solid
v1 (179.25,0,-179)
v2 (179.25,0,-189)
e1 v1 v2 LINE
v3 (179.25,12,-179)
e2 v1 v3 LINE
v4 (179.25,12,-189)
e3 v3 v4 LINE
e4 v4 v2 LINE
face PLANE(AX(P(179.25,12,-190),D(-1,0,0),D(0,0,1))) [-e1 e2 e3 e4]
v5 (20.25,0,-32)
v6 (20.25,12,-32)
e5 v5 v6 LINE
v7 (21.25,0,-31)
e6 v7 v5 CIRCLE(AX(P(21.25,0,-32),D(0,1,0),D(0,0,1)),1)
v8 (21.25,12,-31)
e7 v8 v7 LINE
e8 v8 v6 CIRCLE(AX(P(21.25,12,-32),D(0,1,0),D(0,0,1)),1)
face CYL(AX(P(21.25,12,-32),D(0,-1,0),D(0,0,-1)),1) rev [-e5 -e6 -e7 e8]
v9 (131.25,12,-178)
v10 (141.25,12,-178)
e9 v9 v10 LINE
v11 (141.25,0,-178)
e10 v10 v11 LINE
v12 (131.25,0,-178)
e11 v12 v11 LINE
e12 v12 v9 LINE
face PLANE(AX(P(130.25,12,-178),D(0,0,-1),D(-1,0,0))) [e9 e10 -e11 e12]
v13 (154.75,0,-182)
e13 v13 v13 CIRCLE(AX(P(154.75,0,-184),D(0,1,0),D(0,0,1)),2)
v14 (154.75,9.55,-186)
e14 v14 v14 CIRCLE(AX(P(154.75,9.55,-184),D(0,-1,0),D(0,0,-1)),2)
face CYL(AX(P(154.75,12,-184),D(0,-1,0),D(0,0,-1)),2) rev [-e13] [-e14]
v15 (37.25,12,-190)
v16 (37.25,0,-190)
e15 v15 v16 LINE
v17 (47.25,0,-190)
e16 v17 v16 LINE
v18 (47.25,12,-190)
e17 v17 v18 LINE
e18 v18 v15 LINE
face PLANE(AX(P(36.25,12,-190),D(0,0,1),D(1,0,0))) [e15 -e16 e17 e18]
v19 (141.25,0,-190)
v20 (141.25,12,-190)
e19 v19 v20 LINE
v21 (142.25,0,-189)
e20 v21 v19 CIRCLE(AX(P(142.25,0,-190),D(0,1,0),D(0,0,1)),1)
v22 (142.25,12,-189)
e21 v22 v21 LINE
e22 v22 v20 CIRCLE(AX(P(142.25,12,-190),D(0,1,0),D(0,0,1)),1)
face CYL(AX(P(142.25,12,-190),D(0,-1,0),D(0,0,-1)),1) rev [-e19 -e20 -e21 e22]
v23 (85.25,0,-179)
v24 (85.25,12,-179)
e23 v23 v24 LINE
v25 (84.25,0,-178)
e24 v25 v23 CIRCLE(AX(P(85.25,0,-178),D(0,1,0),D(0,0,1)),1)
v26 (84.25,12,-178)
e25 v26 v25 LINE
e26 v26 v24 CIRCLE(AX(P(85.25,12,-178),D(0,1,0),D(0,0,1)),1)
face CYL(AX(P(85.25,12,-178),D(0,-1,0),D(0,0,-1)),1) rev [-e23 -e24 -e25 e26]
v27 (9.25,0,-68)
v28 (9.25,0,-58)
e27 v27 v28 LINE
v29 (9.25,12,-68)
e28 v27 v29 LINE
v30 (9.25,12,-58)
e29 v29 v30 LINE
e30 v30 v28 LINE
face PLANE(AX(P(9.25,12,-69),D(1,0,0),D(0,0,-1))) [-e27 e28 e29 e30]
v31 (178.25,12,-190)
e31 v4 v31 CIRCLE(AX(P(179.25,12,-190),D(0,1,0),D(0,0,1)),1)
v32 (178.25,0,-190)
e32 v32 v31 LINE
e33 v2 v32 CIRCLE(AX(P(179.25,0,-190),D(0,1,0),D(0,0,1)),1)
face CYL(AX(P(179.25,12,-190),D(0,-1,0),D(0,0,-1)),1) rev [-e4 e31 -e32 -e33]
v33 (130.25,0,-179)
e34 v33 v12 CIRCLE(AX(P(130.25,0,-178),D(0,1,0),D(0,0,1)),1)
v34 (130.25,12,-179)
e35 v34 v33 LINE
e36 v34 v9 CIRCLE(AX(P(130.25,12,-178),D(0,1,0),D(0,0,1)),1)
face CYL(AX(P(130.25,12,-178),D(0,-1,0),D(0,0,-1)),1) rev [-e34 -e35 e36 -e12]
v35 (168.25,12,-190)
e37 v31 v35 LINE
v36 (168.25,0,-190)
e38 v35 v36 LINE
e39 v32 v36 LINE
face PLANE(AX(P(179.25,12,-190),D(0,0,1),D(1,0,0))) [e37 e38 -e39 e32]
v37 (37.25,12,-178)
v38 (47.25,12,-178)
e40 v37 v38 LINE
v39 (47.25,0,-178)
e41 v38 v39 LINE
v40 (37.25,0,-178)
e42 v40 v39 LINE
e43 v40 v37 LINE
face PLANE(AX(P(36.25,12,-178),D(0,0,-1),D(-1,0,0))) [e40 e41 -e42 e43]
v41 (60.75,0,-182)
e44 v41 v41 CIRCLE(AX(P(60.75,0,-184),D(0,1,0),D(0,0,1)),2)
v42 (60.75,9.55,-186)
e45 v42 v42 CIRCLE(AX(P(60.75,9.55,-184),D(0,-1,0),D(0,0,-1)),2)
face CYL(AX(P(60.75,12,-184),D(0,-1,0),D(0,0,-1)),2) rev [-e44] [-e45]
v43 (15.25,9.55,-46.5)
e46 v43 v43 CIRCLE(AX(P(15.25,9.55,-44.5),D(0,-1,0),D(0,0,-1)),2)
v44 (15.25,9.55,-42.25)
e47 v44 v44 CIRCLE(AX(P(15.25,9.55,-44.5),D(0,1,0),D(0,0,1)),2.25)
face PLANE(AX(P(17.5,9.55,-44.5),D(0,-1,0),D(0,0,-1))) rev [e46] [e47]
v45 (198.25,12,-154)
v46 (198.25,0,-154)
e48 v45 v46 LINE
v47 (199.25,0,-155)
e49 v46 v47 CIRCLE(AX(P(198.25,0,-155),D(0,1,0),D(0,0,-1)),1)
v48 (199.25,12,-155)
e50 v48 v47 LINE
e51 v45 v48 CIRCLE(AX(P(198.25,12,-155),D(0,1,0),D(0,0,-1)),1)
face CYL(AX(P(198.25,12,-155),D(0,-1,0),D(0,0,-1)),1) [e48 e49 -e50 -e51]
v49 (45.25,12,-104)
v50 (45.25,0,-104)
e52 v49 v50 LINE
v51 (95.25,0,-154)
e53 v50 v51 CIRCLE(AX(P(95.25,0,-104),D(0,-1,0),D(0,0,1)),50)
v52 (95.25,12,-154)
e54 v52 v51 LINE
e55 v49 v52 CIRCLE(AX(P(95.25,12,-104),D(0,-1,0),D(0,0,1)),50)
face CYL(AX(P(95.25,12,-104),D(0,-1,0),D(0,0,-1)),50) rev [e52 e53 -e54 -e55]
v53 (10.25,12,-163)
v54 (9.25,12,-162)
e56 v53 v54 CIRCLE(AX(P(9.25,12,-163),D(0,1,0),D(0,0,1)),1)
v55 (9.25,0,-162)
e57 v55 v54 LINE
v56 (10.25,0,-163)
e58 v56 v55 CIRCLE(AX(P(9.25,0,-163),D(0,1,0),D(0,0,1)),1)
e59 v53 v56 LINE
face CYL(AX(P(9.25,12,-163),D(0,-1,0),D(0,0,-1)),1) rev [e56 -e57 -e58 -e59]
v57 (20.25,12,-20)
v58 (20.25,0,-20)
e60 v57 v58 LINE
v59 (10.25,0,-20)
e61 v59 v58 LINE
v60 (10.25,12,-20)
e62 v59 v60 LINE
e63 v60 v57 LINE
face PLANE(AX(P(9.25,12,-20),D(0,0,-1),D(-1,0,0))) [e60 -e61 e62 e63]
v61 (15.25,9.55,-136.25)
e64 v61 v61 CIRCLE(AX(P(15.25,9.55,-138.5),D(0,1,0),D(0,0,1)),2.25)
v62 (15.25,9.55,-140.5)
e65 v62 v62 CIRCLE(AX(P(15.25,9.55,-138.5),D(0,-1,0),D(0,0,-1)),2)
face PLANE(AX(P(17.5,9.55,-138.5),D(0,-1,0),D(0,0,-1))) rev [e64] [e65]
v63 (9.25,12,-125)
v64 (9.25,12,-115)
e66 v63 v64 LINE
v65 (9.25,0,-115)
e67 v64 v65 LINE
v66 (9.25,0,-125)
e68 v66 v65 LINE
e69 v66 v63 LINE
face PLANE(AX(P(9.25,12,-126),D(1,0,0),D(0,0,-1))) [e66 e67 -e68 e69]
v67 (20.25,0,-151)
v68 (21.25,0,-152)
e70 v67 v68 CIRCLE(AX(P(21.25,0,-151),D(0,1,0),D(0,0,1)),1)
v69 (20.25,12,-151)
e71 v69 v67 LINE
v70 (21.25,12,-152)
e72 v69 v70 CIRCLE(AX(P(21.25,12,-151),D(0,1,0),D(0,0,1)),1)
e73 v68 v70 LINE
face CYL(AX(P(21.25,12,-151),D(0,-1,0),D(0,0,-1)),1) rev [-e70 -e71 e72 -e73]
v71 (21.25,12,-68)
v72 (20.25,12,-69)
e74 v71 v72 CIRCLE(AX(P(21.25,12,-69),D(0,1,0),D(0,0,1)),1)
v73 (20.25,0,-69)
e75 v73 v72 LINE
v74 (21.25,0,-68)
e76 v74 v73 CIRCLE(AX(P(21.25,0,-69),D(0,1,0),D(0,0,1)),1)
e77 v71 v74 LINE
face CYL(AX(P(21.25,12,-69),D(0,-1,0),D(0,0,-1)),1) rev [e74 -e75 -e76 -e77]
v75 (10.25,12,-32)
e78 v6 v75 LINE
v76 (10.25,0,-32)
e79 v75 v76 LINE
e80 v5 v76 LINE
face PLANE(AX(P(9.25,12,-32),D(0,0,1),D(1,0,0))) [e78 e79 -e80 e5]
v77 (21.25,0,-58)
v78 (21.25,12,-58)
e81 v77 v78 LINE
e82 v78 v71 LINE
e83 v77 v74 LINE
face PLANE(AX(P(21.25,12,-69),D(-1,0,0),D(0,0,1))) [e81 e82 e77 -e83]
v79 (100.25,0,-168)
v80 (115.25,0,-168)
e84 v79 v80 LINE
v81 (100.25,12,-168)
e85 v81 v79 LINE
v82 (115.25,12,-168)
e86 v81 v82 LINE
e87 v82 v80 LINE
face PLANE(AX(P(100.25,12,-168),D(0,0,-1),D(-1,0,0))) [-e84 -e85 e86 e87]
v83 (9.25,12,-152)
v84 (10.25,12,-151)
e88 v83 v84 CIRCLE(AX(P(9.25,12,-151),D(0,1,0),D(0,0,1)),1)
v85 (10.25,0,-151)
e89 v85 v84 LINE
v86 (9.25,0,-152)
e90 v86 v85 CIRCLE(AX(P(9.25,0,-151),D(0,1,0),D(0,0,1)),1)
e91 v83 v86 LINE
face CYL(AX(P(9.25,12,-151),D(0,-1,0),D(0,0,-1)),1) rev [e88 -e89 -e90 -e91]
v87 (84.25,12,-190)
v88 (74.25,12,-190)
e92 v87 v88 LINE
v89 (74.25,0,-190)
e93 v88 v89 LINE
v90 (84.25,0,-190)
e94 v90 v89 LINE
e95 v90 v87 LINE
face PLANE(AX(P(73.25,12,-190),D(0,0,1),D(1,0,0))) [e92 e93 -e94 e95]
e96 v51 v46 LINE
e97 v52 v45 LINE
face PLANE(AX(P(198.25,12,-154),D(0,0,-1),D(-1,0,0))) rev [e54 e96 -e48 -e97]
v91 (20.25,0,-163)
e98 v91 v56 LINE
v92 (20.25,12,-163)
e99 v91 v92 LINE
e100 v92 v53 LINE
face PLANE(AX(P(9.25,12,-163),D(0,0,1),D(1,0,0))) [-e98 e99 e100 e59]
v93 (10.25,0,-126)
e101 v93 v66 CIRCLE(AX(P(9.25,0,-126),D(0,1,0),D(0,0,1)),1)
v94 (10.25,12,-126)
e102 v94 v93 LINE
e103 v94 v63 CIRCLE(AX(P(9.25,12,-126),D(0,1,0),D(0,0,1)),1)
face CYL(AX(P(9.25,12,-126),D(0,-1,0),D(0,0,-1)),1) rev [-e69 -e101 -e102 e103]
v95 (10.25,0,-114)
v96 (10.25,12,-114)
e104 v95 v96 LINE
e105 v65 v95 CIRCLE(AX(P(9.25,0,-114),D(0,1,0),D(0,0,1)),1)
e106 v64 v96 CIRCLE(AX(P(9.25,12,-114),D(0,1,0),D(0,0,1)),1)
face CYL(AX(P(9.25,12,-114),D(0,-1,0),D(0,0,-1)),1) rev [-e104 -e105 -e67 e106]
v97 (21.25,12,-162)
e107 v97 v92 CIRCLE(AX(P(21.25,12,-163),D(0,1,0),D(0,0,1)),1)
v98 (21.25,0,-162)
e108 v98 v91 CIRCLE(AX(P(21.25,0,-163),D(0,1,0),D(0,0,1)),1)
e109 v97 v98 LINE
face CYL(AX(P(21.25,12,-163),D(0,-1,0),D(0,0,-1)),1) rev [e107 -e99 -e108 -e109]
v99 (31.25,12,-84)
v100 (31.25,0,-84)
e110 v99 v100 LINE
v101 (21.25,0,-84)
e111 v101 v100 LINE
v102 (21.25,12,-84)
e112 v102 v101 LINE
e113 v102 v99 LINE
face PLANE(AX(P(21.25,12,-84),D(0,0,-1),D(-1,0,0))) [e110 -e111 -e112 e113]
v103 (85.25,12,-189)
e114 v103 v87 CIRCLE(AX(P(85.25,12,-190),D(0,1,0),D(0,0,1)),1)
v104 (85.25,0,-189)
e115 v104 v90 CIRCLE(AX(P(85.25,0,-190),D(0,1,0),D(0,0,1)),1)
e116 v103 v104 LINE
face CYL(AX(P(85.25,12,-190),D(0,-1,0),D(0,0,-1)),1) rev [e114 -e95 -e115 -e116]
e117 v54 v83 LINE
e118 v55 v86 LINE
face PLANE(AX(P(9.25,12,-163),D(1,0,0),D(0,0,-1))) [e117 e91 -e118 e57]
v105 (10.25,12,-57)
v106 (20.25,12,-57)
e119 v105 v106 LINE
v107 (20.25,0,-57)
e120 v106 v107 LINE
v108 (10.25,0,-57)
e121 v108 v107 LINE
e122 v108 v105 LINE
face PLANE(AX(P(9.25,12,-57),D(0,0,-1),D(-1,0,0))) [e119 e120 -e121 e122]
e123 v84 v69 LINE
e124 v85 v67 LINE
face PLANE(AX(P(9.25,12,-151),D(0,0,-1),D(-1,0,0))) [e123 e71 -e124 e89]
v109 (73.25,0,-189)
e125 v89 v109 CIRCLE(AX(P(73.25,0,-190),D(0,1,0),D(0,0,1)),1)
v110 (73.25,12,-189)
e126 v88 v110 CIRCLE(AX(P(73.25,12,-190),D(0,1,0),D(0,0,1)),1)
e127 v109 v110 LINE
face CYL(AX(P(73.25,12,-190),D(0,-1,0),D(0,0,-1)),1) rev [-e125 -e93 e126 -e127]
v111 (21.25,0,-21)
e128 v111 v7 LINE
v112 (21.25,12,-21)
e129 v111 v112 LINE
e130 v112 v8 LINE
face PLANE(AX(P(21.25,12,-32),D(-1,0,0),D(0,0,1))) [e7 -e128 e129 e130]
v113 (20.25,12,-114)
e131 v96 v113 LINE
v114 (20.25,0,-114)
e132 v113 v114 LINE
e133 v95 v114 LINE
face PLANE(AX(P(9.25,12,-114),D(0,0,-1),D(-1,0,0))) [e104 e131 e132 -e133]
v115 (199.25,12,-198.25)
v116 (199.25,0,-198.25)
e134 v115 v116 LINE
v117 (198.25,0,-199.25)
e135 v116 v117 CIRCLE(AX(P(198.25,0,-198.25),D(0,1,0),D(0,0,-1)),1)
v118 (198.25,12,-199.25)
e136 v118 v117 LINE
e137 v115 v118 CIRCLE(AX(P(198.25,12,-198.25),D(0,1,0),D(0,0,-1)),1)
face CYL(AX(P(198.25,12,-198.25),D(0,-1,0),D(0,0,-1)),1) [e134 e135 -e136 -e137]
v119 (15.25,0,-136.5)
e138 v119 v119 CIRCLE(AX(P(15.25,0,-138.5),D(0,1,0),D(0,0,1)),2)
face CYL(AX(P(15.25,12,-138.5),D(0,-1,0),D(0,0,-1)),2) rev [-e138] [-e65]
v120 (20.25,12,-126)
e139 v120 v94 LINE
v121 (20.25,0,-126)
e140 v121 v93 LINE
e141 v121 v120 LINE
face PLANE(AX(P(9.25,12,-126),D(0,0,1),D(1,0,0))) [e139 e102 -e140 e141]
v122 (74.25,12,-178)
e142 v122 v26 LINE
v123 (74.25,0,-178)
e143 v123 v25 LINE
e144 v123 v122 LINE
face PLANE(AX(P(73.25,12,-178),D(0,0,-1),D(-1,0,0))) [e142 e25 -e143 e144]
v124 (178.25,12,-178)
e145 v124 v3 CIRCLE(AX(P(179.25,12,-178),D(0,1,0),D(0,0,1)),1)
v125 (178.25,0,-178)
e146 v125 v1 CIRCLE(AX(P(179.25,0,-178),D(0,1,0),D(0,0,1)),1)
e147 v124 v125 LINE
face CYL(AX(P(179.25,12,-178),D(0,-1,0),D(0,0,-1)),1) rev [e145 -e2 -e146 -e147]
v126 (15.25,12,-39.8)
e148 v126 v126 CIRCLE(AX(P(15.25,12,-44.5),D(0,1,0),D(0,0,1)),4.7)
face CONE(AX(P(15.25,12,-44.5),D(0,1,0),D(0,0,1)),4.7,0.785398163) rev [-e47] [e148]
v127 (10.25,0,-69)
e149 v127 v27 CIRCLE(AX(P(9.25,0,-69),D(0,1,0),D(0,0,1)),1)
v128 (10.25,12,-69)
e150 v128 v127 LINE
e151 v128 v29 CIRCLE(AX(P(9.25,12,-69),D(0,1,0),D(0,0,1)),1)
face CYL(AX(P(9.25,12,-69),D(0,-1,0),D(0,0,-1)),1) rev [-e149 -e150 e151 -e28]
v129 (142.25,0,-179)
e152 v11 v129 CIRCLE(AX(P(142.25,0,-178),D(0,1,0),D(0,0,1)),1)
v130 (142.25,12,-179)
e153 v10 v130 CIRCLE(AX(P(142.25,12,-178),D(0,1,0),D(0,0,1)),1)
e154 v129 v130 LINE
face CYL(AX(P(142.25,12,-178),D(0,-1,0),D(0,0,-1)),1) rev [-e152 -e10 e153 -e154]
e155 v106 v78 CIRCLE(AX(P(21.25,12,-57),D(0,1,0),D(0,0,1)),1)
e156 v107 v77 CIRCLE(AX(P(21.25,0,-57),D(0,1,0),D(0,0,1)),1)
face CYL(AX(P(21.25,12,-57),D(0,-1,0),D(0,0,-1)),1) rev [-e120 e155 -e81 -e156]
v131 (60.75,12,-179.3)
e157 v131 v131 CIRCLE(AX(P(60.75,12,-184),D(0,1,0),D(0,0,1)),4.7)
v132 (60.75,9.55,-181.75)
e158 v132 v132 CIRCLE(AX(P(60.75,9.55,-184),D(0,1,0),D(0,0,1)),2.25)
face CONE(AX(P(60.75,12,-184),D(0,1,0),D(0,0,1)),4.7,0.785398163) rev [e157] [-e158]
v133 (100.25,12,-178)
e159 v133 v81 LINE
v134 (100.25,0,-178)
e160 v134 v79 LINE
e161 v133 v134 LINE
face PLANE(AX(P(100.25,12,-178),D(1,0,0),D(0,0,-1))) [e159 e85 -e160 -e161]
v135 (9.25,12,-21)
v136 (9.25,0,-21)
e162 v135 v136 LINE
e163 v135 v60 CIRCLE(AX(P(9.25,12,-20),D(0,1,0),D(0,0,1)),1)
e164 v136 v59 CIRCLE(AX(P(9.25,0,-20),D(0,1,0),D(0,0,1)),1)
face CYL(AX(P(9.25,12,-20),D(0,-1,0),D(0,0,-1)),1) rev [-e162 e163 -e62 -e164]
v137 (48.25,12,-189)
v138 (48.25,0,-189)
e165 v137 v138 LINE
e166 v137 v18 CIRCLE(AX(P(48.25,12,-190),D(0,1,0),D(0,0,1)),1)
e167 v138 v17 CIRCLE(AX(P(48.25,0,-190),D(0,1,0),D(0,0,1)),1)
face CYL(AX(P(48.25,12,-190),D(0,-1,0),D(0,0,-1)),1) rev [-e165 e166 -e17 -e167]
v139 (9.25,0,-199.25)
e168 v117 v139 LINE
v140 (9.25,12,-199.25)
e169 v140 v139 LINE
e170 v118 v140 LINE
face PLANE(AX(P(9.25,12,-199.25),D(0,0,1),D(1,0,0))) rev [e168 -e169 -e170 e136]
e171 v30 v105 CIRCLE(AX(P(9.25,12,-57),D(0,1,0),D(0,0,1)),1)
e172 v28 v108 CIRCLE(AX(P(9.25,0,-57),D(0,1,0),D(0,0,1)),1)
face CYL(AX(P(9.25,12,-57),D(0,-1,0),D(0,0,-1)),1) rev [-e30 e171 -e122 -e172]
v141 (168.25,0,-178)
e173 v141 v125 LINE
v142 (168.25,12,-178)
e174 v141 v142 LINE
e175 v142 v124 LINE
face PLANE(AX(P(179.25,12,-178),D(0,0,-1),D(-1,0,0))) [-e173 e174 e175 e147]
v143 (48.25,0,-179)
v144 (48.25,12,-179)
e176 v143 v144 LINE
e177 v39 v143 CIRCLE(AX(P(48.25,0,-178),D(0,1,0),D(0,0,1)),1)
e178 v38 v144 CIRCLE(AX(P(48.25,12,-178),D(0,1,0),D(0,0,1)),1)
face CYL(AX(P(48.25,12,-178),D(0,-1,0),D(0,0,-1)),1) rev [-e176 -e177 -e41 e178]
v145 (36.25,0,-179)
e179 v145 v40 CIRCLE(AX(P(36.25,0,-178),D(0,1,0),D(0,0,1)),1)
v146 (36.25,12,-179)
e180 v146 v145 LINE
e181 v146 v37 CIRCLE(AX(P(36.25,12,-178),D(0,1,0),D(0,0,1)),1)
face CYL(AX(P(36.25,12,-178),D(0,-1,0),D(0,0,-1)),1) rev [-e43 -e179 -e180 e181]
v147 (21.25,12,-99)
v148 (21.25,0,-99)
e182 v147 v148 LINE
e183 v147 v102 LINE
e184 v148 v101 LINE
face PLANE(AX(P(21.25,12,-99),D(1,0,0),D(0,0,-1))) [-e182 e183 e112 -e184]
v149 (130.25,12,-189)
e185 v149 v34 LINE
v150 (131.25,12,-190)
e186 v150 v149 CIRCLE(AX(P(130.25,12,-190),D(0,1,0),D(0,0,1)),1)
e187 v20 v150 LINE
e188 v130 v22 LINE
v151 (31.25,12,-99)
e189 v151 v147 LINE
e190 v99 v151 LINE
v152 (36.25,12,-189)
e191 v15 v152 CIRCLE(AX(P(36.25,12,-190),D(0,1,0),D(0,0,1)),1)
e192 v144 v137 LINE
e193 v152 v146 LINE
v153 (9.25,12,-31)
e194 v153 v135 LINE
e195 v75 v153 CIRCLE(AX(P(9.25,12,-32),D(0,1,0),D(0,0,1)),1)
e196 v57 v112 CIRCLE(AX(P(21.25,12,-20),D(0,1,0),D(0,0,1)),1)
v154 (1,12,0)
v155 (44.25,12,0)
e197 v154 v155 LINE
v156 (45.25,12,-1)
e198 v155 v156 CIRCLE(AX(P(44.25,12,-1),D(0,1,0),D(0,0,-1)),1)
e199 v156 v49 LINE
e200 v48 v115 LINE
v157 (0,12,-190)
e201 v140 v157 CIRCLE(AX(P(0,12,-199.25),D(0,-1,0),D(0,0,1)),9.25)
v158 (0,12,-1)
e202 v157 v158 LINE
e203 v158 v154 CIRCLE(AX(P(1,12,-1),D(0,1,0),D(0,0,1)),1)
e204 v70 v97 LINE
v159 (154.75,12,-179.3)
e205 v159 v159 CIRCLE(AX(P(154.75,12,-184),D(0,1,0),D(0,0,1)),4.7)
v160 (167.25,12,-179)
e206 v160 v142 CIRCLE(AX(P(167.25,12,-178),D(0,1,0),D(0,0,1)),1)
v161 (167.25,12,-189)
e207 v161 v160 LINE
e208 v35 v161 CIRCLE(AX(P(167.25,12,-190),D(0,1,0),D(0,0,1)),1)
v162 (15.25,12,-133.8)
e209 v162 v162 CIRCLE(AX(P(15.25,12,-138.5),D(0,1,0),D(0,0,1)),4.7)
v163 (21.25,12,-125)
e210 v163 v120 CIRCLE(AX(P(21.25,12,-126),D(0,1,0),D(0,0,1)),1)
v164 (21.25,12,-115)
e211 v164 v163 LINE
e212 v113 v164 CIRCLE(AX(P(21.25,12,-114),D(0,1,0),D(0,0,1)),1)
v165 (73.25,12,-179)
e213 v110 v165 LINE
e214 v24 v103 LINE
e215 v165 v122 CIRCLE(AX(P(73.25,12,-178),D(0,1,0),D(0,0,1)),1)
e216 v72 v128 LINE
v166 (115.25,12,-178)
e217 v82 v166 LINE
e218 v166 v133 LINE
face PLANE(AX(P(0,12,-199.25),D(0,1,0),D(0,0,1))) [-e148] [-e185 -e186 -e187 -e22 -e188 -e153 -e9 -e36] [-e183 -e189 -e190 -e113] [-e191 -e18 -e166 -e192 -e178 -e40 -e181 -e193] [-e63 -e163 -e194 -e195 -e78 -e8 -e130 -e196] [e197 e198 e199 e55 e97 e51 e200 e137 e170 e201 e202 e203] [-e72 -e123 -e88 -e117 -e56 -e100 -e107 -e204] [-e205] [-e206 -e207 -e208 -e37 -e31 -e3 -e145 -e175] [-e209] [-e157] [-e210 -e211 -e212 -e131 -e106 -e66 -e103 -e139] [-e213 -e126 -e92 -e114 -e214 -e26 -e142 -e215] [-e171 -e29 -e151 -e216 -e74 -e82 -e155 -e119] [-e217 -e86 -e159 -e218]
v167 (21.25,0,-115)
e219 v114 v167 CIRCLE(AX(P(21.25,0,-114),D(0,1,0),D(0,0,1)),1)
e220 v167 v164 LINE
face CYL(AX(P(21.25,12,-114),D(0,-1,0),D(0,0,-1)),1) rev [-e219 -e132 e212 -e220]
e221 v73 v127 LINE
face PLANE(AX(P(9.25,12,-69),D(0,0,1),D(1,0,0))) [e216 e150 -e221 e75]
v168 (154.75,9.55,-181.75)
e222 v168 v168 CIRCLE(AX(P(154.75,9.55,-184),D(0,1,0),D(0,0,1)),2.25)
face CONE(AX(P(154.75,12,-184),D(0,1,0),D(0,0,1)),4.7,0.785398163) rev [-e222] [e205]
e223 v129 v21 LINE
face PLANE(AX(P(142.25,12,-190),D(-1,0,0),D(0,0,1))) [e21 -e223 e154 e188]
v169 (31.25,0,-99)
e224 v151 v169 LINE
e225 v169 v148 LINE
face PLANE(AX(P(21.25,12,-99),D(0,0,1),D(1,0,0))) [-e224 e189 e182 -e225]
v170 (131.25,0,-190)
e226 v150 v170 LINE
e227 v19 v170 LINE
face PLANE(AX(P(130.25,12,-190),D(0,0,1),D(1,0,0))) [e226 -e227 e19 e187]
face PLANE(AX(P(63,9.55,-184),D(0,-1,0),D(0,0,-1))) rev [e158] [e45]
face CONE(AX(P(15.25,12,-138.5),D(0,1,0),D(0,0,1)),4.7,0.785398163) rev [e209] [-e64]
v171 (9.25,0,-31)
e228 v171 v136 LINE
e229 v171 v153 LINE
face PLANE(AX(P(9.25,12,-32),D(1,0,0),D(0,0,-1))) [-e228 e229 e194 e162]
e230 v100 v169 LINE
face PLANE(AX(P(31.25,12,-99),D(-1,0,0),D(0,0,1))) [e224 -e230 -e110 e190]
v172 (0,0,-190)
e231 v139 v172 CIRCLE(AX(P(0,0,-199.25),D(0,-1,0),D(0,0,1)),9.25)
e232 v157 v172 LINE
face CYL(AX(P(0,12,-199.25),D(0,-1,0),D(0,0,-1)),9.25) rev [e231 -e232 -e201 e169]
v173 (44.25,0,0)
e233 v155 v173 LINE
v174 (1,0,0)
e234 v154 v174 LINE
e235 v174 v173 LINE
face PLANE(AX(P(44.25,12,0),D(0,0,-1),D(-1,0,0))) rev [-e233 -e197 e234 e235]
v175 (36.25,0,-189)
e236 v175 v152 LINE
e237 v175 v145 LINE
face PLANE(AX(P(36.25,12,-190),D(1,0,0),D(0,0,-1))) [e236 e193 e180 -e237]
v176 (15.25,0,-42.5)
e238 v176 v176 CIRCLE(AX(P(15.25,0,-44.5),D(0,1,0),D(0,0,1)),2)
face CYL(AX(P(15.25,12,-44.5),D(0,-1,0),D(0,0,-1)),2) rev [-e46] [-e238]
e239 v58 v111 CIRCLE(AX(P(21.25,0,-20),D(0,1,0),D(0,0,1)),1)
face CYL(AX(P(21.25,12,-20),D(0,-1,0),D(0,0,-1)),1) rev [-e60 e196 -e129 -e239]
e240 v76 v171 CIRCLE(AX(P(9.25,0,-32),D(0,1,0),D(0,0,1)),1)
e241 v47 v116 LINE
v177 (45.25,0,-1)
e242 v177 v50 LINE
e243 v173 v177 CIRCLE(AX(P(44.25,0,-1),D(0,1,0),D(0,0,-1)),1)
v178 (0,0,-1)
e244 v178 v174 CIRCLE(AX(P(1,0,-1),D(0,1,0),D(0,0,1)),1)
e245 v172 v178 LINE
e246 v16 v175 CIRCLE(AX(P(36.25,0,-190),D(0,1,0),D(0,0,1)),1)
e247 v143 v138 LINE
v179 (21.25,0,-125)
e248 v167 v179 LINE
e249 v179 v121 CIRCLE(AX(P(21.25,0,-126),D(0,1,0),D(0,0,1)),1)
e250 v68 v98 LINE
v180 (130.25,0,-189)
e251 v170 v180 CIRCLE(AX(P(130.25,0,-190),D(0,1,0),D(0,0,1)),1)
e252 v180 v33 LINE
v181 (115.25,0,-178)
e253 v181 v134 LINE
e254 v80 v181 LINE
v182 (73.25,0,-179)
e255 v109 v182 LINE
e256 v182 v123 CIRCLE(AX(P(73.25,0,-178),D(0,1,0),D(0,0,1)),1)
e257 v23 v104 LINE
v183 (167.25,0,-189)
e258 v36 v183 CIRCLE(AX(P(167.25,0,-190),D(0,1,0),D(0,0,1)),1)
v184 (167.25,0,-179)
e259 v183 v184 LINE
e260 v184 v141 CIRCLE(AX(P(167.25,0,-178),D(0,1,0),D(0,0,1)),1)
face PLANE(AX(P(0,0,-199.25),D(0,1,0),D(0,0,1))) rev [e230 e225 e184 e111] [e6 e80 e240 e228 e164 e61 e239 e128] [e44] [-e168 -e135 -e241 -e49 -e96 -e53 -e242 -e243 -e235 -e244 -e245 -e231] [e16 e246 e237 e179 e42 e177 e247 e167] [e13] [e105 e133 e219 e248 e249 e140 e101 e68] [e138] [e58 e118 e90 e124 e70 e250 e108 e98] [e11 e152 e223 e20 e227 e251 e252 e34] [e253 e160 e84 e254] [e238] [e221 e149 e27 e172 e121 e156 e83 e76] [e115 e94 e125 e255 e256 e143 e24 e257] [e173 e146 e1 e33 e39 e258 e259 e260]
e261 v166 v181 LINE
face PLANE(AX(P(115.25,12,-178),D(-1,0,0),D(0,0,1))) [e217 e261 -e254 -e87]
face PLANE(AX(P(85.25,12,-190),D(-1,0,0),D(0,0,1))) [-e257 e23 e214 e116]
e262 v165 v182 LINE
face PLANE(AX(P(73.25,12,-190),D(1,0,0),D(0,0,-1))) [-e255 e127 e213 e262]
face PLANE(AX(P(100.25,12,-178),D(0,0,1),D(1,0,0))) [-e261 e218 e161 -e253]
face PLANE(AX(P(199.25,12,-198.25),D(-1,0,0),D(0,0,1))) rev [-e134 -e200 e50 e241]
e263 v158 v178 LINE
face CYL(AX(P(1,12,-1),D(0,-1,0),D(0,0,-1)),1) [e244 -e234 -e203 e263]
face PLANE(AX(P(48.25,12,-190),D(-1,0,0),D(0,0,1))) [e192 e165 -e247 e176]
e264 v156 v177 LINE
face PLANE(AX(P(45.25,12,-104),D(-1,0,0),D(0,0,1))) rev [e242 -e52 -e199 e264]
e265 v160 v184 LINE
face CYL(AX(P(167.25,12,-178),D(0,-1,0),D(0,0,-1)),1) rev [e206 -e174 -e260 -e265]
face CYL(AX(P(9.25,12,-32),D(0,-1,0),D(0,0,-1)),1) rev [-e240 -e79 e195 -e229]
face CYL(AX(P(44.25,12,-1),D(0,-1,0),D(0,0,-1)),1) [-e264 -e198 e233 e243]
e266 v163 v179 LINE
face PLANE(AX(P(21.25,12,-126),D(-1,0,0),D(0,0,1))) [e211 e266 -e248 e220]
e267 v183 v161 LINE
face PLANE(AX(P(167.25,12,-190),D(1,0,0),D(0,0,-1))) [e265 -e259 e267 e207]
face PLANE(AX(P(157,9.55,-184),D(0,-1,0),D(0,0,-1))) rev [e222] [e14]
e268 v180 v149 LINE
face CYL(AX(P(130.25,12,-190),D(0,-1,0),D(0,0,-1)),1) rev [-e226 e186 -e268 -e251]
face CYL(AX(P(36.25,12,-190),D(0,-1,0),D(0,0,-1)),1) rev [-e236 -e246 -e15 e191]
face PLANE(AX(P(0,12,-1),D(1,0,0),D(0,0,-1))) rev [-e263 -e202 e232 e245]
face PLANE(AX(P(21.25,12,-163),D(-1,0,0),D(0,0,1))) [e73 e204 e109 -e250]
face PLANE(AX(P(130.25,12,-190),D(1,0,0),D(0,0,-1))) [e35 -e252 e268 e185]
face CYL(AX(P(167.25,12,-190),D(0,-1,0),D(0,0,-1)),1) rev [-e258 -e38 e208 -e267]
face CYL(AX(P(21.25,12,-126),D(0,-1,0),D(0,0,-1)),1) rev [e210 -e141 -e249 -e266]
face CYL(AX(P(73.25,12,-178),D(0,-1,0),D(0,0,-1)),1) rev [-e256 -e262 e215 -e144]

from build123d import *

# Parameters (mm, degrees)
SKETCH1_R                   = 2
SKETCH1_W                   = 10
SKETCH1_H                   = 15
SKETCH1_W_2                 = 15
SKETCH1_H_2                 = 10
SKETCH1_W_3                 = 12
SKETCH1_H_3                 = 12
BOSS_EXTRUDE1_DEPTH         = 12
SKETCH2_R                   = 1
CUT_EXTRUDE1_DEPTH          = 12
ADVANCEDHOLE1_OUTLINE_R     = 2.25
ADVANCEDHOLE1_OUTLINE_R_2   = 2
ADVANCEDHOLE1_DEPTH         = 2.45
ADVANCEDHOLE1_DRAFT         = -45
ADVANCEDHOLE1_2_OUTLINE_R   = 2.25
ADVANCEDHOLE1_2_OUTLINE_R_2 = 2
ADVANCEDHOLE1_2_DEPTH       = 2.45
ADVANCEDHOLE1_2_DRAFT       = -45
ADVANCEDHOLE1_3_OUTLINE_R   = 2.25
ADVANCEDHOLE1_3_OUTLINE_R_2 = 2
ADVANCEDHOLE1_3_DEPTH       = 2.45
ADVANCEDHOLE1_3_DRAFT       = -45
ADVANCEDHOLE1_4_OUTLINE_R   = 2.25
ADVANCEDHOLE1_4_OUTLINE_R_2 = 2
ADVANCEDHOLE1_4_DEPTH       = 2.45
ADVANCEDHOLE1_4_DRAFT       = -45


# Read off the part's stored shape, not the designer's step: AdvancedHole1
with BuildPart() as part:
    # Sketch1 → Boss-Extrude1 (new body)
    with BuildSketch(Plane(origin=(0, 0, 0), x_dir=(1, 0, 0), z_dir=(0, 1, 0))):
        with BuildLine():
            Line((0, 1), (0, 190))
            ThreePointArc((0, 190), (6.540737726, 192.709262274), (9.25, 199.25))
            Line((9.25, 199.25), (10.25, 199.25))
            Line((10.25, 199.25), (198.25, 199.25))
            ThreePointArc((198.25, 199.25), (198.957106781, 198.957106781), (199.25, 198.25))
            Line((199.25, 198.25), (199.25, 155))
            ThreePointArc((199.25, 155), (198.957106781, 154.292893219), (198.25, 154))
            Line((198.25, 154), (95.25, 154))
            ThreePointArc((95.25, 154), (59.894660941, 139.355339059), (45.25, 104))
            Line((45.25, 104), (45.25, 1))
            ThreePointArc((45.25, 1), (44.957106781, 0.292893219), (44.25, 0))
            Line((44.25, 0), (1, 0))
            ThreePointArc((1, 0), (0.292893219, 0.292893219), (0, 1))
        make_face()
        with Locations(Location((60.75, 184, 0), (0, 0, 270))):
            Circle(SKETCH1_R, mode=Mode.SUBTRACT)
        with Locations(Location((154.75, 184, 0), (0, 0, 270))):
            Circle(SKETCH1_R, mode=Mode.SUBTRACT)
        with Locations(Location((15.25, 138.5, 0), (0, 0, 270))):
            Circle(SKETCH1_R, mode=Mode.SUBTRACT)
        with Locations(Location((15.25, 44.5, 0), (0, 0, 270))):
            Circle(SKETCH1_R, mode=Mode.SUBTRACT)
        with Locations((26.25, 91.5)):
            Rectangle(SKETCH1_W, SKETCH1_H, mode=Mode.SUBTRACT)
        with Locations((107.75, 173)):
            Rectangle(SKETCH1_W_2, SKETCH1_H_2, mode=Mode.SUBTRACT)
        with Locations((42.25, 184)):
            Rectangle(SKETCH1_W_3, SKETCH1_H_3, mode=Mode.SUBTRACT)
        with Locations((173.25, 184)):
            Rectangle(SKETCH1_W_3, SKETCH1_H_3, mode=Mode.SUBTRACT)
        with Locations((79.25, 184)):
            Rectangle(SKETCH1_W_3, SKETCH1_H_3, mode=Mode.SUBTRACT)
        with Locations((136.25, 184)):
            Rectangle(SKETCH1_W_3, SKETCH1_H_3, mode=Mode.SUBTRACT)
        with Locations((15.25, 120)):
            Rectangle(SKETCH1_W_3, SKETCH1_H_3, mode=Mode.SUBTRACT)
        with Locations((15.25, 26)):
            Rectangle(SKETCH1_W_3, SKETCH1_H_3, mode=Mode.SUBTRACT)
        with Locations((15.25, 63)):
            Rectangle(SKETCH1_W_3, SKETCH1_H_3, mode=Mode.SUBTRACT)
        with Locations((15.25, 157)):
            Rectangle(SKETCH1_W_3, SKETCH1_H_3, mode=Mode.SUBTRACT)
    extrude(amount=BOSS_EXTRUDE1_DEPTH)

    # Sketch2 → Cut-Extrude1 (cut)
    with BuildSketch(Plane(origin=(0, 0, 0), x_dir=(1, 0, 0), z_dir=(0, 1, 0))):
        with Locations((9.25, 151)):
            Circle(SKETCH2_R)
        with Locations((9.25, 163)):
            Circle(SKETCH2_R)
        with Locations((21.25, 163)):
            Circle(SKETCH2_R)
        with Locations((21.25, 151)):
            Circle(SKETCH2_R)
        with Locations((21.25, 126)):
            Circle(SKETCH2_R)
        with Locations((9.25, 114)):
            Circle(SKETCH2_R)
        with Locations((9.25, 126)):
            Circle(SKETCH2_R)
        with Locations((21.25, 114)):
            Circle(SKETCH2_R)
        with Locations((21.25, 69)):
            Circle(SKETCH2_R)
        with Locations((21.25, 57)):
            Circle(SKETCH2_R)
        with Locations((9.25, 57)):
            Circle(SKETCH2_R)
        with Locations((9.25, 69)):
            Circle(SKETCH2_R)
        with Locations((21.25, 32)):
            Circle(SKETCH2_R)
        with Locations((21.25, 20)):
            Circle(SKETCH2_R)
        with Locations((9.25, 20)):
            Circle(SKETCH2_R)
        with Locations((9.25, 32)):
            Circle(SKETCH2_R)
        with Locations((48.25, 178)):
            Circle(SKETCH2_R)
        with Locations((48.25, 190)):
            Circle(SKETCH2_R)
        with Locations((36.25, 190)):
            Circle(SKETCH2_R)
        with Locations((36.25, 178)):
            Circle(SKETCH2_R)
        with Locations((73.25, 178)):
            Circle(SKETCH2_R)
        with Locations((85.25, 178)):
            Circle(SKETCH2_R)
        with Locations((85.25, 190)):
            Circle(SKETCH2_R)
        with Locations((73.25, 190)):
            Circle(SKETCH2_R)
        with Locations((130.25, 178)):
            Circle(SKETCH2_R)
        with Locations((130.25, 190)):
            Circle(SKETCH2_R)
        with Locations((142.25, 190)):
            Circle(SKETCH2_R)
        with Locations((142.25, 178)):
            Circle(SKETCH2_R)
        with Locations((167.25, 178)):
            Circle(SKETCH2_R)
        with Locations((167.25, 190)):
            Circle(SKETCH2_R)
        with Locations((179.25, 190)):
            Circle(SKETCH2_R)
        with Locations((179.25, 178)):
            Circle(SKETCH2_R)
    extrude(amount=CUT_EXTRUDE1_DEPTH, mode=Mode.SUBTRACT)


with BuildPart() as advancedhole1_tool:
    # AdvancedHole1 outline → AdvancedHole1 (with draft: the straight prism first)
    with BuildSketch(Plane(origin=(0, 9.55, 0), x_dir=(1, 0, 0), z_dir=(0, 1, 0))):
        with Locations((154.75, 184)):
            Circle(ADVANCEDHOLE1_OUTLINE_R)
        with Locations((154.75, 184)):
            Circle(ADVANCEDHOLE1_OUTLINE_R_2, mode=Mode.SUBTRACT)
    extrude(amount=ADVANCEDHOLE1_DEPTH)
    # AdvancedHole1: the draft: its side faces are tilted about the plane it starts from
    advancedhole1_sides = [advancedhole1_tool.faces().sort_by_distance(p)[0] for p in [
        (152.5, 10.775, -184),
        (152.75, 10.775, -184),
    ]]
    draft(advancedhole1_sides, Plane(origin=(0, 9.55, 0), x_dir=(1, 0, 0), z_dir=(0, 1, 0)), ADVANCEDHOLE1_DRAFT)


with BuildPart() as part_1:
    add(part.part)

    # AdvancedHole1: cut by advancedhole1_tool
    add(advancedhole1_tool.part, mode=Mode.SUBTRACT)


with BuildPart() as advancedhole1_2_tool:
    # AdvancedHole1 2 outline → AdvancedHole1 2 (with draft: the straight prism first)
    with BuildSketch(Plane(origin=(0, 9.55, 0), x_dir=(1, 0, 0), z_dir=(0, 1, 0))):
        with Locations((60.75, 184)):
            Circle(ADVANCEDHOLE1_2_OUTLINE_R)
        with Locations((60.75, 184)):
            Circle(ADVANCEDHOLE1_2_OUTLINE_R_2, mode=Mode.SUBTRACT)
    extrude(amount=ADVANCEDHOLE1_2_DEPTH)
    # AdvancedHole1 2: the draft: its side faces are tilted about the plane it starts from
    advancedhole1_2_sides = [advancedhole1_2_tool.faces().sort_by_distance(p)[0] for p in [
        (58.5, 10.775, -184),
        (58.75, 10.775, -184),
    ]]
    draft(advancedhole1_2_sides, Plane(origin=(0, 9.55, 0), x_dir=(1, 0, 0), z_dir=(0, 1, 0)), ADVANCEDHOLE1_2_DRAFT)


with BuildPart() as part_2:
    add(part_1.part)

    # AdvancedHole1 2: cut by advancedhole1_2_tool
    add(advancedhole1_2_tool.part, mode=Mode.SUBTRACT)


with BuildPart() as advancedhole1_3_tool:
    # AdvancedHole1 3 outline → AdvancedHole1 3 (with draft: the straight prism first)
    with BuildSketch(Plane(origin=(0, 9.55, 0), x_dir=(1, 0, 0), z_dir=(0, 1, 0))):
        with Locations((15.25, 138.5)):
            Circle(ADVANCEDHOLE1_3_OUTLINE_R)
        with Locations((15.25, 138.5)):
            Circle(ADVANCEDHOLE1_3_OUTLINE_R_2, mode=Mode.SUBTRACT)
    extrude(amount=ADVANCEDHOLE1_3_DEPTH)
    # AdvancedHole1 3: the draft: its side faces are tilted about the plane it starts from
    advancedhole1_3_sides = [advancedhole1_3_tool.faces().sort_by_distance(p)[0] for p in [
        (13, 10.775, -138.5),
        (13.25, 10.775, -138.5),
    ]]
    draft(advancedhole1_3_sides, Plane(origin=(0, 9.55, 0), x_dir=(1, 0, 0), z_dir=(0, 1, 0)), ADVANCEDHOLE1_3_DRAFT)


with BuildPart() as part_3:
    add(part_2.part)

    # AdvancedHole1 3: cut by advancedhole1_3_tool
    add(advancedhole1_3_tool.part, mode=Mode.SUBTRACT)


with BuildPart() as advancedhole1_4_tool:
    # AdvancedHole1 4 outline → AdvancedHole1 4 (with draft: the straight prism first)
    with BuildSketch(Plane(origin=(0, 9.55, 0), x_dir=(1, 0, 0), z_dir=(0, 1, 0))):
        with Locations((15.25, 44.5)):
            Circle(ADVANCEDHOLE1_4_OUTLINE_R)
        with Locations((15.25, 44.5)):
            Circle(ADVANCEDHOLE1_4_OUTLINE_R_2, mode=Mode.SUBTRACT)
    extrude(amount=ADVANCEDHOLE1_4_DEPTH)
    # AdvancedHole1 4: the draft: its side faces are tilted about the plane it starts from
    advancedhole1_4_sides = [advancedhole1_4_tool.faces().sort_by_distance(p)[0] for p in [
        (13, 10.775, -44.5),
        (13.25, 10.775, -44.5),
    ]]
    draft(advancedhole1_4_sides, Plane(origin=(0, 9.55, 0), x_dir=(1, 0, 0), z_dir=(0, 1, 0)), ADVANCEDHOLE1_4_DRAFT)


with BuildPart() as part_4:
    add(part_3.part)

    # AdvancedHole1 4: cut by advancedhole1_4_tool
    add(advancedhole1_4_tool.part, mode=Mode.SUBTRACT)


solid = part_4.part
